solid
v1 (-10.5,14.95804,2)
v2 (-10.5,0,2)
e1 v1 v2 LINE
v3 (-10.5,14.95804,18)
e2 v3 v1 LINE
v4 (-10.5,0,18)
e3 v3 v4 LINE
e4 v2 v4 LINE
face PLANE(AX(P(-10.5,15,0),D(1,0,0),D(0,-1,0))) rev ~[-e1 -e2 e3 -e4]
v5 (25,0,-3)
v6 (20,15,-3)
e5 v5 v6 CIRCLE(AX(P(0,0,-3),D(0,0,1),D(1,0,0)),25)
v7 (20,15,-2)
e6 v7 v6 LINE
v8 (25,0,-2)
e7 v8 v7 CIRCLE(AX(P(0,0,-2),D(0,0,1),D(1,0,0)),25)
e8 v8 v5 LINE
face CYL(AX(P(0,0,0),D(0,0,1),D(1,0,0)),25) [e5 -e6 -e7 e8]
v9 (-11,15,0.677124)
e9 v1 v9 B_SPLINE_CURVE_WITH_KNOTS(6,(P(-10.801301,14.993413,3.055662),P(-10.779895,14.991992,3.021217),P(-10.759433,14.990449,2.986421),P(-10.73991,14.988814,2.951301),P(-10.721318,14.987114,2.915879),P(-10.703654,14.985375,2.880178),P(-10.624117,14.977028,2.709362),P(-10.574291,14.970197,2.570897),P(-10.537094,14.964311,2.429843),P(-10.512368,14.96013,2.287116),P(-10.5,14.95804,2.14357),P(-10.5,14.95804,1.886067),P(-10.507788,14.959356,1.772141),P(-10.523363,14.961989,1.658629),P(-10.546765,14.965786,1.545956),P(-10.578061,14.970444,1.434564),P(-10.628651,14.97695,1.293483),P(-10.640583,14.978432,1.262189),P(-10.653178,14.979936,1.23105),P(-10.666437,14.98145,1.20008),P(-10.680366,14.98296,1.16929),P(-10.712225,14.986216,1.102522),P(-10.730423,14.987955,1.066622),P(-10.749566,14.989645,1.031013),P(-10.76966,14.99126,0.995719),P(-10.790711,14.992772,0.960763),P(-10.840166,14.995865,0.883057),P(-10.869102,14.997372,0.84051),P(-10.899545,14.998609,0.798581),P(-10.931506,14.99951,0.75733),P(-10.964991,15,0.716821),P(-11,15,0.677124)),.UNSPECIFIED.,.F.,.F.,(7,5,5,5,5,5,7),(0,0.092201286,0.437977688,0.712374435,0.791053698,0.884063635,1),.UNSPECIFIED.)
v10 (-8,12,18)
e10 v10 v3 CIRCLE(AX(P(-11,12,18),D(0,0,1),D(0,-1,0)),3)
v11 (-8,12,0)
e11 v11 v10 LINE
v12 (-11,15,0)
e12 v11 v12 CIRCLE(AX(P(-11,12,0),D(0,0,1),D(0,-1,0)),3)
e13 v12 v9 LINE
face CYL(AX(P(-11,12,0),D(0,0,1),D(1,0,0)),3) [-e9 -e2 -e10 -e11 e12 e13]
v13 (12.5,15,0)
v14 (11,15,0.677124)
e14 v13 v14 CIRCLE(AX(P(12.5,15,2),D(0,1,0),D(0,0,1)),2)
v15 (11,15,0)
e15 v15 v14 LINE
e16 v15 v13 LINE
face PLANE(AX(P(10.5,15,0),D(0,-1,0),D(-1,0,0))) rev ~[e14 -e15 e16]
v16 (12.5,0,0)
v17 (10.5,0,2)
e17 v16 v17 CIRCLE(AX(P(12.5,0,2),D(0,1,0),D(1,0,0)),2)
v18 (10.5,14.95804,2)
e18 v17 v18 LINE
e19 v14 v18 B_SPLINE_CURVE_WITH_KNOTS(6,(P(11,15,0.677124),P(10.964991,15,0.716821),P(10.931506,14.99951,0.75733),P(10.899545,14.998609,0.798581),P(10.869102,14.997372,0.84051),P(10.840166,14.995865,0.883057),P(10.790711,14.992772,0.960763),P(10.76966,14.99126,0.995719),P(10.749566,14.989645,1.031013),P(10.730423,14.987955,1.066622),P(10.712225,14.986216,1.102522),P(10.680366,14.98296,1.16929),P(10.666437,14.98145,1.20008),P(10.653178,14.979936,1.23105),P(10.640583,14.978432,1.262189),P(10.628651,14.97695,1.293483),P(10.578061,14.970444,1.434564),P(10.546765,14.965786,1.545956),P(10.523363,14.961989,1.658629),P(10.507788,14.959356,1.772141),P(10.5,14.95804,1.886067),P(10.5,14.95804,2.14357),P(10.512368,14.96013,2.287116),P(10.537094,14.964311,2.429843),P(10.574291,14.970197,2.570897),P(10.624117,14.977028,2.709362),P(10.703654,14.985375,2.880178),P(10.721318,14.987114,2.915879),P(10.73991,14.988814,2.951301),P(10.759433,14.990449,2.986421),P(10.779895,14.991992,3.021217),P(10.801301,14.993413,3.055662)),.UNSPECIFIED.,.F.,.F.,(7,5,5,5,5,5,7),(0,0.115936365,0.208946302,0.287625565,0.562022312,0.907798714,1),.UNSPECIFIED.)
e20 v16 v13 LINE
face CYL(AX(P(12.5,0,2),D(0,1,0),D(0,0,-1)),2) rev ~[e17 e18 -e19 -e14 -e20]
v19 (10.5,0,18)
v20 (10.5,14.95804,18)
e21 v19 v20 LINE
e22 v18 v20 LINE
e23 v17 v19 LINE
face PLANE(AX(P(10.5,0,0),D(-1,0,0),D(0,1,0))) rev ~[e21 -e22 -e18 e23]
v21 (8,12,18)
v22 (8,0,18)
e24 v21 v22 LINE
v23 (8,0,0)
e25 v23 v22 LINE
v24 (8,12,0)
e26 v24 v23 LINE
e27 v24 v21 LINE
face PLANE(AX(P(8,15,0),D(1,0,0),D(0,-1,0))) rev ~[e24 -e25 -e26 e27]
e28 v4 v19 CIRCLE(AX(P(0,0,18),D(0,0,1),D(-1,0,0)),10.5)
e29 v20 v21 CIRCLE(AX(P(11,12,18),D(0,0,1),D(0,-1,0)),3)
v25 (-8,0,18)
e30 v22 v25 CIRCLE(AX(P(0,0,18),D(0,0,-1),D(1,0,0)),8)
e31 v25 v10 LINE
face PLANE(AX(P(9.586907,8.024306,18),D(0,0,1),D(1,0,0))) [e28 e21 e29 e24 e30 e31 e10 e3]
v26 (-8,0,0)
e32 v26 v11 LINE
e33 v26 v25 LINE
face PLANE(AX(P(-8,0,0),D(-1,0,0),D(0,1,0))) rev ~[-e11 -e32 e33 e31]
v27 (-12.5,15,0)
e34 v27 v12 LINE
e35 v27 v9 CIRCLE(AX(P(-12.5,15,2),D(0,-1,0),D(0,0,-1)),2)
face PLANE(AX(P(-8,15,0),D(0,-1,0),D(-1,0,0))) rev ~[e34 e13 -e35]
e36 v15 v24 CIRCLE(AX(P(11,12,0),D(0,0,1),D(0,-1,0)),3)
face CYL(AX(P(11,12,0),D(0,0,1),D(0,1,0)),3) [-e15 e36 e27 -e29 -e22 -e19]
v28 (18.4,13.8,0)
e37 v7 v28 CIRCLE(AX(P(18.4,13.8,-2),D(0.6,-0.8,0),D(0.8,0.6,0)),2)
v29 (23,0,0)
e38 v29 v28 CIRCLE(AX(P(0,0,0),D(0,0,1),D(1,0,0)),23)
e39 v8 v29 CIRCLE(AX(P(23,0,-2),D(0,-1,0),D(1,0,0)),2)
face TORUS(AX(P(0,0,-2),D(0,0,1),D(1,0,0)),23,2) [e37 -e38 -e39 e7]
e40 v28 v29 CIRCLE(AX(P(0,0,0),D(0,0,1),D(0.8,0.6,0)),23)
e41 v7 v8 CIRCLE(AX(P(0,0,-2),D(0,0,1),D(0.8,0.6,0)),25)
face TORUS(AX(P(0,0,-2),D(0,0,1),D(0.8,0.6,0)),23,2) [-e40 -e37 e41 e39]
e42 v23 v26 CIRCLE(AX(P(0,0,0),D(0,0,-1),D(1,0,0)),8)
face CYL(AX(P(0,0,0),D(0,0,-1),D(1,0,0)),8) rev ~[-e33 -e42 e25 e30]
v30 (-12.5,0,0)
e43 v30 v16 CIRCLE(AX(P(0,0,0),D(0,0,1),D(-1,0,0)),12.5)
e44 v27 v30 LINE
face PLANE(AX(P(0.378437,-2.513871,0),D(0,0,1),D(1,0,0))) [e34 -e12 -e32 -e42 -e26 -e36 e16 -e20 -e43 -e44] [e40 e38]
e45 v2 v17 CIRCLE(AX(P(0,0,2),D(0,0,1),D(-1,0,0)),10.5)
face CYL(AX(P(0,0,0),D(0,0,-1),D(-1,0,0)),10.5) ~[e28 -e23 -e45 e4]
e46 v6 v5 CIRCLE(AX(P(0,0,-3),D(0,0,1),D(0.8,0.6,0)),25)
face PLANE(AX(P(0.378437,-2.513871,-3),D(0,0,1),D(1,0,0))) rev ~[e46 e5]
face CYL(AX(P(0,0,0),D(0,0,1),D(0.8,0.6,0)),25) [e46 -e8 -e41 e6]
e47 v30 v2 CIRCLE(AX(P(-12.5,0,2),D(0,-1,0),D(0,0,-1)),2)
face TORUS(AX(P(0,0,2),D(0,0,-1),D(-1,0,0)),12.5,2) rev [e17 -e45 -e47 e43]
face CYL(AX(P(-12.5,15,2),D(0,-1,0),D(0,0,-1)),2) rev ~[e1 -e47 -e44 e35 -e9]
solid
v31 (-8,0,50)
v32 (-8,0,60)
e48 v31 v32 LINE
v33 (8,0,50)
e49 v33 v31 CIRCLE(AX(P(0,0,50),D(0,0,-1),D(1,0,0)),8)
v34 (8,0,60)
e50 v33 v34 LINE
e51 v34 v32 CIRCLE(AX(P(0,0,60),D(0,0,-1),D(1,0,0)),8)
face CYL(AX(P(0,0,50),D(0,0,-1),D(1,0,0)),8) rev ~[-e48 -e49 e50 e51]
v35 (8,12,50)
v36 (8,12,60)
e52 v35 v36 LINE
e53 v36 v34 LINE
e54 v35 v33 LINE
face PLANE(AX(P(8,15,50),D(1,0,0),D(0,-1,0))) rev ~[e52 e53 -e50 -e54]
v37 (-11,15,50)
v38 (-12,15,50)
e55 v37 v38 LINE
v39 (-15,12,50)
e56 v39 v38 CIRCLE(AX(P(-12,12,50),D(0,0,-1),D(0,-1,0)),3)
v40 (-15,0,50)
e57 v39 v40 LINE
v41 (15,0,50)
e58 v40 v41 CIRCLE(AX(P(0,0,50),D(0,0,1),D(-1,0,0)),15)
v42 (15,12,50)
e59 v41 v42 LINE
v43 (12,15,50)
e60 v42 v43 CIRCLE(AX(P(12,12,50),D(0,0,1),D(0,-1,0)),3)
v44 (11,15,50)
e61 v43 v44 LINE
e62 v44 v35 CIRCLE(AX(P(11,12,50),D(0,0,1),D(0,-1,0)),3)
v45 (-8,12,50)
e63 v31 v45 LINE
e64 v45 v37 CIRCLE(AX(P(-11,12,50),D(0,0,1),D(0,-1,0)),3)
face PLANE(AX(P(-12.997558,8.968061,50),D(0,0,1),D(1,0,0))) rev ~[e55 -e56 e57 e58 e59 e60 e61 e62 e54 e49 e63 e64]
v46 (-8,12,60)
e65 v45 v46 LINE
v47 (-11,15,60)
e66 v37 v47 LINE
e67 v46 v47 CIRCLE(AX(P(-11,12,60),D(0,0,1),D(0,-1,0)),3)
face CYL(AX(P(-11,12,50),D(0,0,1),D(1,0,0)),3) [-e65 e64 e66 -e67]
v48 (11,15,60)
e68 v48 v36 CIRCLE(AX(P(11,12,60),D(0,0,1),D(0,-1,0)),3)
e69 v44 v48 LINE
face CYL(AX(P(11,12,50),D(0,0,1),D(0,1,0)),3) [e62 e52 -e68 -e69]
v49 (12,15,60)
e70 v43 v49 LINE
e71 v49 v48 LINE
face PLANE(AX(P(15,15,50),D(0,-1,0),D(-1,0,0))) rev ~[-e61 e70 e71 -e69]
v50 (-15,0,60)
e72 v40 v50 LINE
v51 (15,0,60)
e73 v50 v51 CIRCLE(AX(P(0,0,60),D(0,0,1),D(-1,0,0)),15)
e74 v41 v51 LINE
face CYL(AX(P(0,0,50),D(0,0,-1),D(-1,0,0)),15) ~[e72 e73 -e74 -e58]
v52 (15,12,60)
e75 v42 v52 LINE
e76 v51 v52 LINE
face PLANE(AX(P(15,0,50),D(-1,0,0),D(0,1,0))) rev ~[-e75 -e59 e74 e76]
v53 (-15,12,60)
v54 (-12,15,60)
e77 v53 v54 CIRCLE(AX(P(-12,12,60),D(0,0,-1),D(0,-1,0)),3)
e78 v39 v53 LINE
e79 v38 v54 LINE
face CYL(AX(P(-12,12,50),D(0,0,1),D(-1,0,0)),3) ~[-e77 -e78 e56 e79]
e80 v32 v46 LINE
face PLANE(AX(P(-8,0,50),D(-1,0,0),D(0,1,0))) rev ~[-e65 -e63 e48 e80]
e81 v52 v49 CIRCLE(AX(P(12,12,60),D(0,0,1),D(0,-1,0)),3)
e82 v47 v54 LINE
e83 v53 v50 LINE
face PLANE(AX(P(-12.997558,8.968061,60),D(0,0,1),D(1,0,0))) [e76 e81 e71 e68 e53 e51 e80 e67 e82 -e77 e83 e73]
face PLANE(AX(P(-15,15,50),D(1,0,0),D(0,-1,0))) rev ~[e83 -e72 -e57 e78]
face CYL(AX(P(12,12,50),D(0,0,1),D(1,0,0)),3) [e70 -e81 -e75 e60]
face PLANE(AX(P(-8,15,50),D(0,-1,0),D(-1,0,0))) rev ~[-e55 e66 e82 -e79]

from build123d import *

# Parameters (mm, degrees)
F1_DEPTH = 3
F2_DEPTH = 18
F3_R     = 2
F4_R     = 3
F7_DEPTH = 10
F8_R     = 3


with BuildPart() as f1:
    # F0 (on Top) → F1 (new body)
    with BuildSketch(Plane.XY):
        with BuildLine():
            ThreePointArc((-20, 15), (-7.9056941504, -23.7170824513), (25, 0))
            ThreePointArc((25, 0), (23.7170824513, 7.9056941504), (20, 15))
            Line((20, 15), (10.5, 15))
            Line((10.5, 15), (10.5, 0))
            ThreePointArc((10.5, 0), (0, -10.5), (-10.5, 0))
            Line((-10.5, 0), (-10.5, 15))
            Line((-10.5, 15), (-20, 15))
        make_face()
        with BuildLine():
            Line((10.5, 15), (20, 15))
            ThreePointArc((20, 15), (0, 25), (-20, 15))
            Line((-20, 15), (-10.5, 15))
            Line((-10.5, 15), (-8, 15))
            Line((-8, 15), (8, 15))
            Line((8, 15), (10.5, 15))
        make_face()
        with BuildLine():
            ThreePointArc((-8, 0), (0, -8), (8, 0))
            ThreePointArc((8, 0), (0, 8), (-8, 0))
        make_face()
        with BuildLine():
            Line((8, 0), (8, 6.8007352544))
            ThreePointArc((8, 6.8007352544), (0, 10.5), (-8, 6.8007352544))
            Line((-8, 6.8007352544), (-8, 0))
            ThreePointArc((-8, 0), (0, 8), (8, 0))
        make_face()
        with BuildLine():
            ThreePointArc((-10.5, 0), (0, -10.5), (10.5, 0))
            ThreePointArc((10.5, 0), (9.8552016722, 3.6228441865), (8, 6.8007352544))
            Line((8, 6.8007352544), (8, 0))
            ThreePointArc((8, 0), (0, -8), (-8, 0))
            Line((-8, 0), (-8, 6.8007352544))
            ThreePointArc((-8, 6.8007352544), (-9.8552016722, 3.6228441865), (-10.5, 0))
        make_face()
        with BuildLine():
            Line((-8, 15), (-10.5, 15))
            Line((-10.5, 15), (-10.5, 0))
            ThreePointArc((-10.5, 0), (-9.8552016722, 3.6228441865), (-8, 6.8007352544))
            Line((-8, 6.8007352544), (-8, 15))
        make_face()
        with BuildLine():
            Line((8, 6.8007352544), (8, 15))
            Line((8, 15), (-8, 15))
            Line((-8, 15), (-8, 6.8007352544))
            ThreePointArc((-8, 6.8007352544), (0, 10.5), (8, 6.8007352544))
        make_face()
        with BuildLine():
            Line((10.5, 0), (10.5, 15))
            Line((10.5, 15), (8, 15))
            Line((8, 15), (8, 6.8007352544))
            ThreePointArc((8, 6.8007352544), (9.8552016722, 3.6228441865), (10.5, 0))
        make_face()
    extrude(amount=-F1_DEPTH)

    # F0 (on Top) → F2 (join)
    with BuildSketch(Plane.XY):
        with BuildLine():
            Line((10.5, 0), (10.5, 15))
            Line((10.5, 15), (8, 15))
            Line((8, 15), (8, 6.8007352544))
            ThreePointArc((8, 6.8007352544), (9.8552016722, 3.6228441865), (10.5, 0))
        make_face()
        with BuildLine():
            ThreePointArc((-10.5, 0), (0, -10.5), (10.5, 0))
            ThreePointArc((10.5, 0), (9.8552016722, 3.6228441865), (8, 6.8007352544))
            Line((8, 6.8007352544), (8, 0))
            ThreePointArc((8, 0), (0, -8), (-8, 0))
            Line((-8, 0), (-8, 6.8007352544))
            ThreePointArc((-8, 6.8007352544), (-9.8552016722, 3.6228441865), (-10.5, 0))
        make_face()
        with BuildLine():
            Line((-8, 15), (-10.5, 15))
            Line((-10.5, 15), (-10.5, 0))
            ThreePointArc((-10.5, 0), (-9.8552016722, 3.6228441865), (-8, 6.8007352544))
            Line((-8, 6.8007352544), (-8, 15))
        make_face()
    extrude(amount=F2_DEPTH)

    # F3
    f3_edges = [f1.edges().sort_by_distance(p)[0] for p in [
        (-25, 0, 0),
        (0, -10.5, 0),
        (10.5, 7.5, 0),
        (-10.5, 7.5, 0),
    ]]
    fillet(f3_edges, radius=F3_R)

    # F4
    f4_edges = [f1.edges().sort_by_distance(p)[0] for p in [
        (-8, 15, 9),
        (8, 15, 9),
    ]]
    fillet(f4_edges, radius=F4_R)


with BuildPart() as f7:
    # F6 (on offset) → F7 (new body)
    with BuildSketch(Plane.XY.offset(50)):
        with BuildLine():
            Line((-15, 15), (-15, 0))
            ThreePointArc((-15, 0), (-13.1339255366, 7.2456883731), (-8, 12.6885775404))
            Line((-8, 12.6885775404), (-8, 15))
            Line((-8, 15), (-15, 15))
        make_face()
        with BuildLine():
            ThreePointArc((-8, 12.6885775404), (-13.1339255366, 7.2456883731), (-15, 0))
            ThreePointArc((-15, 0), (0, -15), (15, 0))
            ThreePointArc((15, 0), (13.1339255366, 7.2456883731), (8, 12.6885775404))
            Line((8, 12.6885775404), (8, 0))
            ThreePointArc((8, 0), (0, -8), (-8, 0))
            Line((-8, 0), (-8, 12.6885775404))
        make_face()
        with BuildLine():
            ThreePointArc((8, 12.6885775404), (13.1339255366, 7.2456883731), (15, 0))
            Line((15, 0), (15, 15))
            Line((15, 15), (8, 15))
            Line((8, 15), (8, 12.6885775404))
        make_face()
    extrude(amount=F7_DEPTH)

    # F8
    f8_edges = [f7.edges().sort_by_distance(p)[0] for p in [
        (-8, 15, 55),
        (8, 15, 55),
        (-15, 15, 55),
        (15, 15, 55),
    ]]
    fillet(f8_edges, radius=F8_R)


solid = Compound([f1.part, f7.part])
